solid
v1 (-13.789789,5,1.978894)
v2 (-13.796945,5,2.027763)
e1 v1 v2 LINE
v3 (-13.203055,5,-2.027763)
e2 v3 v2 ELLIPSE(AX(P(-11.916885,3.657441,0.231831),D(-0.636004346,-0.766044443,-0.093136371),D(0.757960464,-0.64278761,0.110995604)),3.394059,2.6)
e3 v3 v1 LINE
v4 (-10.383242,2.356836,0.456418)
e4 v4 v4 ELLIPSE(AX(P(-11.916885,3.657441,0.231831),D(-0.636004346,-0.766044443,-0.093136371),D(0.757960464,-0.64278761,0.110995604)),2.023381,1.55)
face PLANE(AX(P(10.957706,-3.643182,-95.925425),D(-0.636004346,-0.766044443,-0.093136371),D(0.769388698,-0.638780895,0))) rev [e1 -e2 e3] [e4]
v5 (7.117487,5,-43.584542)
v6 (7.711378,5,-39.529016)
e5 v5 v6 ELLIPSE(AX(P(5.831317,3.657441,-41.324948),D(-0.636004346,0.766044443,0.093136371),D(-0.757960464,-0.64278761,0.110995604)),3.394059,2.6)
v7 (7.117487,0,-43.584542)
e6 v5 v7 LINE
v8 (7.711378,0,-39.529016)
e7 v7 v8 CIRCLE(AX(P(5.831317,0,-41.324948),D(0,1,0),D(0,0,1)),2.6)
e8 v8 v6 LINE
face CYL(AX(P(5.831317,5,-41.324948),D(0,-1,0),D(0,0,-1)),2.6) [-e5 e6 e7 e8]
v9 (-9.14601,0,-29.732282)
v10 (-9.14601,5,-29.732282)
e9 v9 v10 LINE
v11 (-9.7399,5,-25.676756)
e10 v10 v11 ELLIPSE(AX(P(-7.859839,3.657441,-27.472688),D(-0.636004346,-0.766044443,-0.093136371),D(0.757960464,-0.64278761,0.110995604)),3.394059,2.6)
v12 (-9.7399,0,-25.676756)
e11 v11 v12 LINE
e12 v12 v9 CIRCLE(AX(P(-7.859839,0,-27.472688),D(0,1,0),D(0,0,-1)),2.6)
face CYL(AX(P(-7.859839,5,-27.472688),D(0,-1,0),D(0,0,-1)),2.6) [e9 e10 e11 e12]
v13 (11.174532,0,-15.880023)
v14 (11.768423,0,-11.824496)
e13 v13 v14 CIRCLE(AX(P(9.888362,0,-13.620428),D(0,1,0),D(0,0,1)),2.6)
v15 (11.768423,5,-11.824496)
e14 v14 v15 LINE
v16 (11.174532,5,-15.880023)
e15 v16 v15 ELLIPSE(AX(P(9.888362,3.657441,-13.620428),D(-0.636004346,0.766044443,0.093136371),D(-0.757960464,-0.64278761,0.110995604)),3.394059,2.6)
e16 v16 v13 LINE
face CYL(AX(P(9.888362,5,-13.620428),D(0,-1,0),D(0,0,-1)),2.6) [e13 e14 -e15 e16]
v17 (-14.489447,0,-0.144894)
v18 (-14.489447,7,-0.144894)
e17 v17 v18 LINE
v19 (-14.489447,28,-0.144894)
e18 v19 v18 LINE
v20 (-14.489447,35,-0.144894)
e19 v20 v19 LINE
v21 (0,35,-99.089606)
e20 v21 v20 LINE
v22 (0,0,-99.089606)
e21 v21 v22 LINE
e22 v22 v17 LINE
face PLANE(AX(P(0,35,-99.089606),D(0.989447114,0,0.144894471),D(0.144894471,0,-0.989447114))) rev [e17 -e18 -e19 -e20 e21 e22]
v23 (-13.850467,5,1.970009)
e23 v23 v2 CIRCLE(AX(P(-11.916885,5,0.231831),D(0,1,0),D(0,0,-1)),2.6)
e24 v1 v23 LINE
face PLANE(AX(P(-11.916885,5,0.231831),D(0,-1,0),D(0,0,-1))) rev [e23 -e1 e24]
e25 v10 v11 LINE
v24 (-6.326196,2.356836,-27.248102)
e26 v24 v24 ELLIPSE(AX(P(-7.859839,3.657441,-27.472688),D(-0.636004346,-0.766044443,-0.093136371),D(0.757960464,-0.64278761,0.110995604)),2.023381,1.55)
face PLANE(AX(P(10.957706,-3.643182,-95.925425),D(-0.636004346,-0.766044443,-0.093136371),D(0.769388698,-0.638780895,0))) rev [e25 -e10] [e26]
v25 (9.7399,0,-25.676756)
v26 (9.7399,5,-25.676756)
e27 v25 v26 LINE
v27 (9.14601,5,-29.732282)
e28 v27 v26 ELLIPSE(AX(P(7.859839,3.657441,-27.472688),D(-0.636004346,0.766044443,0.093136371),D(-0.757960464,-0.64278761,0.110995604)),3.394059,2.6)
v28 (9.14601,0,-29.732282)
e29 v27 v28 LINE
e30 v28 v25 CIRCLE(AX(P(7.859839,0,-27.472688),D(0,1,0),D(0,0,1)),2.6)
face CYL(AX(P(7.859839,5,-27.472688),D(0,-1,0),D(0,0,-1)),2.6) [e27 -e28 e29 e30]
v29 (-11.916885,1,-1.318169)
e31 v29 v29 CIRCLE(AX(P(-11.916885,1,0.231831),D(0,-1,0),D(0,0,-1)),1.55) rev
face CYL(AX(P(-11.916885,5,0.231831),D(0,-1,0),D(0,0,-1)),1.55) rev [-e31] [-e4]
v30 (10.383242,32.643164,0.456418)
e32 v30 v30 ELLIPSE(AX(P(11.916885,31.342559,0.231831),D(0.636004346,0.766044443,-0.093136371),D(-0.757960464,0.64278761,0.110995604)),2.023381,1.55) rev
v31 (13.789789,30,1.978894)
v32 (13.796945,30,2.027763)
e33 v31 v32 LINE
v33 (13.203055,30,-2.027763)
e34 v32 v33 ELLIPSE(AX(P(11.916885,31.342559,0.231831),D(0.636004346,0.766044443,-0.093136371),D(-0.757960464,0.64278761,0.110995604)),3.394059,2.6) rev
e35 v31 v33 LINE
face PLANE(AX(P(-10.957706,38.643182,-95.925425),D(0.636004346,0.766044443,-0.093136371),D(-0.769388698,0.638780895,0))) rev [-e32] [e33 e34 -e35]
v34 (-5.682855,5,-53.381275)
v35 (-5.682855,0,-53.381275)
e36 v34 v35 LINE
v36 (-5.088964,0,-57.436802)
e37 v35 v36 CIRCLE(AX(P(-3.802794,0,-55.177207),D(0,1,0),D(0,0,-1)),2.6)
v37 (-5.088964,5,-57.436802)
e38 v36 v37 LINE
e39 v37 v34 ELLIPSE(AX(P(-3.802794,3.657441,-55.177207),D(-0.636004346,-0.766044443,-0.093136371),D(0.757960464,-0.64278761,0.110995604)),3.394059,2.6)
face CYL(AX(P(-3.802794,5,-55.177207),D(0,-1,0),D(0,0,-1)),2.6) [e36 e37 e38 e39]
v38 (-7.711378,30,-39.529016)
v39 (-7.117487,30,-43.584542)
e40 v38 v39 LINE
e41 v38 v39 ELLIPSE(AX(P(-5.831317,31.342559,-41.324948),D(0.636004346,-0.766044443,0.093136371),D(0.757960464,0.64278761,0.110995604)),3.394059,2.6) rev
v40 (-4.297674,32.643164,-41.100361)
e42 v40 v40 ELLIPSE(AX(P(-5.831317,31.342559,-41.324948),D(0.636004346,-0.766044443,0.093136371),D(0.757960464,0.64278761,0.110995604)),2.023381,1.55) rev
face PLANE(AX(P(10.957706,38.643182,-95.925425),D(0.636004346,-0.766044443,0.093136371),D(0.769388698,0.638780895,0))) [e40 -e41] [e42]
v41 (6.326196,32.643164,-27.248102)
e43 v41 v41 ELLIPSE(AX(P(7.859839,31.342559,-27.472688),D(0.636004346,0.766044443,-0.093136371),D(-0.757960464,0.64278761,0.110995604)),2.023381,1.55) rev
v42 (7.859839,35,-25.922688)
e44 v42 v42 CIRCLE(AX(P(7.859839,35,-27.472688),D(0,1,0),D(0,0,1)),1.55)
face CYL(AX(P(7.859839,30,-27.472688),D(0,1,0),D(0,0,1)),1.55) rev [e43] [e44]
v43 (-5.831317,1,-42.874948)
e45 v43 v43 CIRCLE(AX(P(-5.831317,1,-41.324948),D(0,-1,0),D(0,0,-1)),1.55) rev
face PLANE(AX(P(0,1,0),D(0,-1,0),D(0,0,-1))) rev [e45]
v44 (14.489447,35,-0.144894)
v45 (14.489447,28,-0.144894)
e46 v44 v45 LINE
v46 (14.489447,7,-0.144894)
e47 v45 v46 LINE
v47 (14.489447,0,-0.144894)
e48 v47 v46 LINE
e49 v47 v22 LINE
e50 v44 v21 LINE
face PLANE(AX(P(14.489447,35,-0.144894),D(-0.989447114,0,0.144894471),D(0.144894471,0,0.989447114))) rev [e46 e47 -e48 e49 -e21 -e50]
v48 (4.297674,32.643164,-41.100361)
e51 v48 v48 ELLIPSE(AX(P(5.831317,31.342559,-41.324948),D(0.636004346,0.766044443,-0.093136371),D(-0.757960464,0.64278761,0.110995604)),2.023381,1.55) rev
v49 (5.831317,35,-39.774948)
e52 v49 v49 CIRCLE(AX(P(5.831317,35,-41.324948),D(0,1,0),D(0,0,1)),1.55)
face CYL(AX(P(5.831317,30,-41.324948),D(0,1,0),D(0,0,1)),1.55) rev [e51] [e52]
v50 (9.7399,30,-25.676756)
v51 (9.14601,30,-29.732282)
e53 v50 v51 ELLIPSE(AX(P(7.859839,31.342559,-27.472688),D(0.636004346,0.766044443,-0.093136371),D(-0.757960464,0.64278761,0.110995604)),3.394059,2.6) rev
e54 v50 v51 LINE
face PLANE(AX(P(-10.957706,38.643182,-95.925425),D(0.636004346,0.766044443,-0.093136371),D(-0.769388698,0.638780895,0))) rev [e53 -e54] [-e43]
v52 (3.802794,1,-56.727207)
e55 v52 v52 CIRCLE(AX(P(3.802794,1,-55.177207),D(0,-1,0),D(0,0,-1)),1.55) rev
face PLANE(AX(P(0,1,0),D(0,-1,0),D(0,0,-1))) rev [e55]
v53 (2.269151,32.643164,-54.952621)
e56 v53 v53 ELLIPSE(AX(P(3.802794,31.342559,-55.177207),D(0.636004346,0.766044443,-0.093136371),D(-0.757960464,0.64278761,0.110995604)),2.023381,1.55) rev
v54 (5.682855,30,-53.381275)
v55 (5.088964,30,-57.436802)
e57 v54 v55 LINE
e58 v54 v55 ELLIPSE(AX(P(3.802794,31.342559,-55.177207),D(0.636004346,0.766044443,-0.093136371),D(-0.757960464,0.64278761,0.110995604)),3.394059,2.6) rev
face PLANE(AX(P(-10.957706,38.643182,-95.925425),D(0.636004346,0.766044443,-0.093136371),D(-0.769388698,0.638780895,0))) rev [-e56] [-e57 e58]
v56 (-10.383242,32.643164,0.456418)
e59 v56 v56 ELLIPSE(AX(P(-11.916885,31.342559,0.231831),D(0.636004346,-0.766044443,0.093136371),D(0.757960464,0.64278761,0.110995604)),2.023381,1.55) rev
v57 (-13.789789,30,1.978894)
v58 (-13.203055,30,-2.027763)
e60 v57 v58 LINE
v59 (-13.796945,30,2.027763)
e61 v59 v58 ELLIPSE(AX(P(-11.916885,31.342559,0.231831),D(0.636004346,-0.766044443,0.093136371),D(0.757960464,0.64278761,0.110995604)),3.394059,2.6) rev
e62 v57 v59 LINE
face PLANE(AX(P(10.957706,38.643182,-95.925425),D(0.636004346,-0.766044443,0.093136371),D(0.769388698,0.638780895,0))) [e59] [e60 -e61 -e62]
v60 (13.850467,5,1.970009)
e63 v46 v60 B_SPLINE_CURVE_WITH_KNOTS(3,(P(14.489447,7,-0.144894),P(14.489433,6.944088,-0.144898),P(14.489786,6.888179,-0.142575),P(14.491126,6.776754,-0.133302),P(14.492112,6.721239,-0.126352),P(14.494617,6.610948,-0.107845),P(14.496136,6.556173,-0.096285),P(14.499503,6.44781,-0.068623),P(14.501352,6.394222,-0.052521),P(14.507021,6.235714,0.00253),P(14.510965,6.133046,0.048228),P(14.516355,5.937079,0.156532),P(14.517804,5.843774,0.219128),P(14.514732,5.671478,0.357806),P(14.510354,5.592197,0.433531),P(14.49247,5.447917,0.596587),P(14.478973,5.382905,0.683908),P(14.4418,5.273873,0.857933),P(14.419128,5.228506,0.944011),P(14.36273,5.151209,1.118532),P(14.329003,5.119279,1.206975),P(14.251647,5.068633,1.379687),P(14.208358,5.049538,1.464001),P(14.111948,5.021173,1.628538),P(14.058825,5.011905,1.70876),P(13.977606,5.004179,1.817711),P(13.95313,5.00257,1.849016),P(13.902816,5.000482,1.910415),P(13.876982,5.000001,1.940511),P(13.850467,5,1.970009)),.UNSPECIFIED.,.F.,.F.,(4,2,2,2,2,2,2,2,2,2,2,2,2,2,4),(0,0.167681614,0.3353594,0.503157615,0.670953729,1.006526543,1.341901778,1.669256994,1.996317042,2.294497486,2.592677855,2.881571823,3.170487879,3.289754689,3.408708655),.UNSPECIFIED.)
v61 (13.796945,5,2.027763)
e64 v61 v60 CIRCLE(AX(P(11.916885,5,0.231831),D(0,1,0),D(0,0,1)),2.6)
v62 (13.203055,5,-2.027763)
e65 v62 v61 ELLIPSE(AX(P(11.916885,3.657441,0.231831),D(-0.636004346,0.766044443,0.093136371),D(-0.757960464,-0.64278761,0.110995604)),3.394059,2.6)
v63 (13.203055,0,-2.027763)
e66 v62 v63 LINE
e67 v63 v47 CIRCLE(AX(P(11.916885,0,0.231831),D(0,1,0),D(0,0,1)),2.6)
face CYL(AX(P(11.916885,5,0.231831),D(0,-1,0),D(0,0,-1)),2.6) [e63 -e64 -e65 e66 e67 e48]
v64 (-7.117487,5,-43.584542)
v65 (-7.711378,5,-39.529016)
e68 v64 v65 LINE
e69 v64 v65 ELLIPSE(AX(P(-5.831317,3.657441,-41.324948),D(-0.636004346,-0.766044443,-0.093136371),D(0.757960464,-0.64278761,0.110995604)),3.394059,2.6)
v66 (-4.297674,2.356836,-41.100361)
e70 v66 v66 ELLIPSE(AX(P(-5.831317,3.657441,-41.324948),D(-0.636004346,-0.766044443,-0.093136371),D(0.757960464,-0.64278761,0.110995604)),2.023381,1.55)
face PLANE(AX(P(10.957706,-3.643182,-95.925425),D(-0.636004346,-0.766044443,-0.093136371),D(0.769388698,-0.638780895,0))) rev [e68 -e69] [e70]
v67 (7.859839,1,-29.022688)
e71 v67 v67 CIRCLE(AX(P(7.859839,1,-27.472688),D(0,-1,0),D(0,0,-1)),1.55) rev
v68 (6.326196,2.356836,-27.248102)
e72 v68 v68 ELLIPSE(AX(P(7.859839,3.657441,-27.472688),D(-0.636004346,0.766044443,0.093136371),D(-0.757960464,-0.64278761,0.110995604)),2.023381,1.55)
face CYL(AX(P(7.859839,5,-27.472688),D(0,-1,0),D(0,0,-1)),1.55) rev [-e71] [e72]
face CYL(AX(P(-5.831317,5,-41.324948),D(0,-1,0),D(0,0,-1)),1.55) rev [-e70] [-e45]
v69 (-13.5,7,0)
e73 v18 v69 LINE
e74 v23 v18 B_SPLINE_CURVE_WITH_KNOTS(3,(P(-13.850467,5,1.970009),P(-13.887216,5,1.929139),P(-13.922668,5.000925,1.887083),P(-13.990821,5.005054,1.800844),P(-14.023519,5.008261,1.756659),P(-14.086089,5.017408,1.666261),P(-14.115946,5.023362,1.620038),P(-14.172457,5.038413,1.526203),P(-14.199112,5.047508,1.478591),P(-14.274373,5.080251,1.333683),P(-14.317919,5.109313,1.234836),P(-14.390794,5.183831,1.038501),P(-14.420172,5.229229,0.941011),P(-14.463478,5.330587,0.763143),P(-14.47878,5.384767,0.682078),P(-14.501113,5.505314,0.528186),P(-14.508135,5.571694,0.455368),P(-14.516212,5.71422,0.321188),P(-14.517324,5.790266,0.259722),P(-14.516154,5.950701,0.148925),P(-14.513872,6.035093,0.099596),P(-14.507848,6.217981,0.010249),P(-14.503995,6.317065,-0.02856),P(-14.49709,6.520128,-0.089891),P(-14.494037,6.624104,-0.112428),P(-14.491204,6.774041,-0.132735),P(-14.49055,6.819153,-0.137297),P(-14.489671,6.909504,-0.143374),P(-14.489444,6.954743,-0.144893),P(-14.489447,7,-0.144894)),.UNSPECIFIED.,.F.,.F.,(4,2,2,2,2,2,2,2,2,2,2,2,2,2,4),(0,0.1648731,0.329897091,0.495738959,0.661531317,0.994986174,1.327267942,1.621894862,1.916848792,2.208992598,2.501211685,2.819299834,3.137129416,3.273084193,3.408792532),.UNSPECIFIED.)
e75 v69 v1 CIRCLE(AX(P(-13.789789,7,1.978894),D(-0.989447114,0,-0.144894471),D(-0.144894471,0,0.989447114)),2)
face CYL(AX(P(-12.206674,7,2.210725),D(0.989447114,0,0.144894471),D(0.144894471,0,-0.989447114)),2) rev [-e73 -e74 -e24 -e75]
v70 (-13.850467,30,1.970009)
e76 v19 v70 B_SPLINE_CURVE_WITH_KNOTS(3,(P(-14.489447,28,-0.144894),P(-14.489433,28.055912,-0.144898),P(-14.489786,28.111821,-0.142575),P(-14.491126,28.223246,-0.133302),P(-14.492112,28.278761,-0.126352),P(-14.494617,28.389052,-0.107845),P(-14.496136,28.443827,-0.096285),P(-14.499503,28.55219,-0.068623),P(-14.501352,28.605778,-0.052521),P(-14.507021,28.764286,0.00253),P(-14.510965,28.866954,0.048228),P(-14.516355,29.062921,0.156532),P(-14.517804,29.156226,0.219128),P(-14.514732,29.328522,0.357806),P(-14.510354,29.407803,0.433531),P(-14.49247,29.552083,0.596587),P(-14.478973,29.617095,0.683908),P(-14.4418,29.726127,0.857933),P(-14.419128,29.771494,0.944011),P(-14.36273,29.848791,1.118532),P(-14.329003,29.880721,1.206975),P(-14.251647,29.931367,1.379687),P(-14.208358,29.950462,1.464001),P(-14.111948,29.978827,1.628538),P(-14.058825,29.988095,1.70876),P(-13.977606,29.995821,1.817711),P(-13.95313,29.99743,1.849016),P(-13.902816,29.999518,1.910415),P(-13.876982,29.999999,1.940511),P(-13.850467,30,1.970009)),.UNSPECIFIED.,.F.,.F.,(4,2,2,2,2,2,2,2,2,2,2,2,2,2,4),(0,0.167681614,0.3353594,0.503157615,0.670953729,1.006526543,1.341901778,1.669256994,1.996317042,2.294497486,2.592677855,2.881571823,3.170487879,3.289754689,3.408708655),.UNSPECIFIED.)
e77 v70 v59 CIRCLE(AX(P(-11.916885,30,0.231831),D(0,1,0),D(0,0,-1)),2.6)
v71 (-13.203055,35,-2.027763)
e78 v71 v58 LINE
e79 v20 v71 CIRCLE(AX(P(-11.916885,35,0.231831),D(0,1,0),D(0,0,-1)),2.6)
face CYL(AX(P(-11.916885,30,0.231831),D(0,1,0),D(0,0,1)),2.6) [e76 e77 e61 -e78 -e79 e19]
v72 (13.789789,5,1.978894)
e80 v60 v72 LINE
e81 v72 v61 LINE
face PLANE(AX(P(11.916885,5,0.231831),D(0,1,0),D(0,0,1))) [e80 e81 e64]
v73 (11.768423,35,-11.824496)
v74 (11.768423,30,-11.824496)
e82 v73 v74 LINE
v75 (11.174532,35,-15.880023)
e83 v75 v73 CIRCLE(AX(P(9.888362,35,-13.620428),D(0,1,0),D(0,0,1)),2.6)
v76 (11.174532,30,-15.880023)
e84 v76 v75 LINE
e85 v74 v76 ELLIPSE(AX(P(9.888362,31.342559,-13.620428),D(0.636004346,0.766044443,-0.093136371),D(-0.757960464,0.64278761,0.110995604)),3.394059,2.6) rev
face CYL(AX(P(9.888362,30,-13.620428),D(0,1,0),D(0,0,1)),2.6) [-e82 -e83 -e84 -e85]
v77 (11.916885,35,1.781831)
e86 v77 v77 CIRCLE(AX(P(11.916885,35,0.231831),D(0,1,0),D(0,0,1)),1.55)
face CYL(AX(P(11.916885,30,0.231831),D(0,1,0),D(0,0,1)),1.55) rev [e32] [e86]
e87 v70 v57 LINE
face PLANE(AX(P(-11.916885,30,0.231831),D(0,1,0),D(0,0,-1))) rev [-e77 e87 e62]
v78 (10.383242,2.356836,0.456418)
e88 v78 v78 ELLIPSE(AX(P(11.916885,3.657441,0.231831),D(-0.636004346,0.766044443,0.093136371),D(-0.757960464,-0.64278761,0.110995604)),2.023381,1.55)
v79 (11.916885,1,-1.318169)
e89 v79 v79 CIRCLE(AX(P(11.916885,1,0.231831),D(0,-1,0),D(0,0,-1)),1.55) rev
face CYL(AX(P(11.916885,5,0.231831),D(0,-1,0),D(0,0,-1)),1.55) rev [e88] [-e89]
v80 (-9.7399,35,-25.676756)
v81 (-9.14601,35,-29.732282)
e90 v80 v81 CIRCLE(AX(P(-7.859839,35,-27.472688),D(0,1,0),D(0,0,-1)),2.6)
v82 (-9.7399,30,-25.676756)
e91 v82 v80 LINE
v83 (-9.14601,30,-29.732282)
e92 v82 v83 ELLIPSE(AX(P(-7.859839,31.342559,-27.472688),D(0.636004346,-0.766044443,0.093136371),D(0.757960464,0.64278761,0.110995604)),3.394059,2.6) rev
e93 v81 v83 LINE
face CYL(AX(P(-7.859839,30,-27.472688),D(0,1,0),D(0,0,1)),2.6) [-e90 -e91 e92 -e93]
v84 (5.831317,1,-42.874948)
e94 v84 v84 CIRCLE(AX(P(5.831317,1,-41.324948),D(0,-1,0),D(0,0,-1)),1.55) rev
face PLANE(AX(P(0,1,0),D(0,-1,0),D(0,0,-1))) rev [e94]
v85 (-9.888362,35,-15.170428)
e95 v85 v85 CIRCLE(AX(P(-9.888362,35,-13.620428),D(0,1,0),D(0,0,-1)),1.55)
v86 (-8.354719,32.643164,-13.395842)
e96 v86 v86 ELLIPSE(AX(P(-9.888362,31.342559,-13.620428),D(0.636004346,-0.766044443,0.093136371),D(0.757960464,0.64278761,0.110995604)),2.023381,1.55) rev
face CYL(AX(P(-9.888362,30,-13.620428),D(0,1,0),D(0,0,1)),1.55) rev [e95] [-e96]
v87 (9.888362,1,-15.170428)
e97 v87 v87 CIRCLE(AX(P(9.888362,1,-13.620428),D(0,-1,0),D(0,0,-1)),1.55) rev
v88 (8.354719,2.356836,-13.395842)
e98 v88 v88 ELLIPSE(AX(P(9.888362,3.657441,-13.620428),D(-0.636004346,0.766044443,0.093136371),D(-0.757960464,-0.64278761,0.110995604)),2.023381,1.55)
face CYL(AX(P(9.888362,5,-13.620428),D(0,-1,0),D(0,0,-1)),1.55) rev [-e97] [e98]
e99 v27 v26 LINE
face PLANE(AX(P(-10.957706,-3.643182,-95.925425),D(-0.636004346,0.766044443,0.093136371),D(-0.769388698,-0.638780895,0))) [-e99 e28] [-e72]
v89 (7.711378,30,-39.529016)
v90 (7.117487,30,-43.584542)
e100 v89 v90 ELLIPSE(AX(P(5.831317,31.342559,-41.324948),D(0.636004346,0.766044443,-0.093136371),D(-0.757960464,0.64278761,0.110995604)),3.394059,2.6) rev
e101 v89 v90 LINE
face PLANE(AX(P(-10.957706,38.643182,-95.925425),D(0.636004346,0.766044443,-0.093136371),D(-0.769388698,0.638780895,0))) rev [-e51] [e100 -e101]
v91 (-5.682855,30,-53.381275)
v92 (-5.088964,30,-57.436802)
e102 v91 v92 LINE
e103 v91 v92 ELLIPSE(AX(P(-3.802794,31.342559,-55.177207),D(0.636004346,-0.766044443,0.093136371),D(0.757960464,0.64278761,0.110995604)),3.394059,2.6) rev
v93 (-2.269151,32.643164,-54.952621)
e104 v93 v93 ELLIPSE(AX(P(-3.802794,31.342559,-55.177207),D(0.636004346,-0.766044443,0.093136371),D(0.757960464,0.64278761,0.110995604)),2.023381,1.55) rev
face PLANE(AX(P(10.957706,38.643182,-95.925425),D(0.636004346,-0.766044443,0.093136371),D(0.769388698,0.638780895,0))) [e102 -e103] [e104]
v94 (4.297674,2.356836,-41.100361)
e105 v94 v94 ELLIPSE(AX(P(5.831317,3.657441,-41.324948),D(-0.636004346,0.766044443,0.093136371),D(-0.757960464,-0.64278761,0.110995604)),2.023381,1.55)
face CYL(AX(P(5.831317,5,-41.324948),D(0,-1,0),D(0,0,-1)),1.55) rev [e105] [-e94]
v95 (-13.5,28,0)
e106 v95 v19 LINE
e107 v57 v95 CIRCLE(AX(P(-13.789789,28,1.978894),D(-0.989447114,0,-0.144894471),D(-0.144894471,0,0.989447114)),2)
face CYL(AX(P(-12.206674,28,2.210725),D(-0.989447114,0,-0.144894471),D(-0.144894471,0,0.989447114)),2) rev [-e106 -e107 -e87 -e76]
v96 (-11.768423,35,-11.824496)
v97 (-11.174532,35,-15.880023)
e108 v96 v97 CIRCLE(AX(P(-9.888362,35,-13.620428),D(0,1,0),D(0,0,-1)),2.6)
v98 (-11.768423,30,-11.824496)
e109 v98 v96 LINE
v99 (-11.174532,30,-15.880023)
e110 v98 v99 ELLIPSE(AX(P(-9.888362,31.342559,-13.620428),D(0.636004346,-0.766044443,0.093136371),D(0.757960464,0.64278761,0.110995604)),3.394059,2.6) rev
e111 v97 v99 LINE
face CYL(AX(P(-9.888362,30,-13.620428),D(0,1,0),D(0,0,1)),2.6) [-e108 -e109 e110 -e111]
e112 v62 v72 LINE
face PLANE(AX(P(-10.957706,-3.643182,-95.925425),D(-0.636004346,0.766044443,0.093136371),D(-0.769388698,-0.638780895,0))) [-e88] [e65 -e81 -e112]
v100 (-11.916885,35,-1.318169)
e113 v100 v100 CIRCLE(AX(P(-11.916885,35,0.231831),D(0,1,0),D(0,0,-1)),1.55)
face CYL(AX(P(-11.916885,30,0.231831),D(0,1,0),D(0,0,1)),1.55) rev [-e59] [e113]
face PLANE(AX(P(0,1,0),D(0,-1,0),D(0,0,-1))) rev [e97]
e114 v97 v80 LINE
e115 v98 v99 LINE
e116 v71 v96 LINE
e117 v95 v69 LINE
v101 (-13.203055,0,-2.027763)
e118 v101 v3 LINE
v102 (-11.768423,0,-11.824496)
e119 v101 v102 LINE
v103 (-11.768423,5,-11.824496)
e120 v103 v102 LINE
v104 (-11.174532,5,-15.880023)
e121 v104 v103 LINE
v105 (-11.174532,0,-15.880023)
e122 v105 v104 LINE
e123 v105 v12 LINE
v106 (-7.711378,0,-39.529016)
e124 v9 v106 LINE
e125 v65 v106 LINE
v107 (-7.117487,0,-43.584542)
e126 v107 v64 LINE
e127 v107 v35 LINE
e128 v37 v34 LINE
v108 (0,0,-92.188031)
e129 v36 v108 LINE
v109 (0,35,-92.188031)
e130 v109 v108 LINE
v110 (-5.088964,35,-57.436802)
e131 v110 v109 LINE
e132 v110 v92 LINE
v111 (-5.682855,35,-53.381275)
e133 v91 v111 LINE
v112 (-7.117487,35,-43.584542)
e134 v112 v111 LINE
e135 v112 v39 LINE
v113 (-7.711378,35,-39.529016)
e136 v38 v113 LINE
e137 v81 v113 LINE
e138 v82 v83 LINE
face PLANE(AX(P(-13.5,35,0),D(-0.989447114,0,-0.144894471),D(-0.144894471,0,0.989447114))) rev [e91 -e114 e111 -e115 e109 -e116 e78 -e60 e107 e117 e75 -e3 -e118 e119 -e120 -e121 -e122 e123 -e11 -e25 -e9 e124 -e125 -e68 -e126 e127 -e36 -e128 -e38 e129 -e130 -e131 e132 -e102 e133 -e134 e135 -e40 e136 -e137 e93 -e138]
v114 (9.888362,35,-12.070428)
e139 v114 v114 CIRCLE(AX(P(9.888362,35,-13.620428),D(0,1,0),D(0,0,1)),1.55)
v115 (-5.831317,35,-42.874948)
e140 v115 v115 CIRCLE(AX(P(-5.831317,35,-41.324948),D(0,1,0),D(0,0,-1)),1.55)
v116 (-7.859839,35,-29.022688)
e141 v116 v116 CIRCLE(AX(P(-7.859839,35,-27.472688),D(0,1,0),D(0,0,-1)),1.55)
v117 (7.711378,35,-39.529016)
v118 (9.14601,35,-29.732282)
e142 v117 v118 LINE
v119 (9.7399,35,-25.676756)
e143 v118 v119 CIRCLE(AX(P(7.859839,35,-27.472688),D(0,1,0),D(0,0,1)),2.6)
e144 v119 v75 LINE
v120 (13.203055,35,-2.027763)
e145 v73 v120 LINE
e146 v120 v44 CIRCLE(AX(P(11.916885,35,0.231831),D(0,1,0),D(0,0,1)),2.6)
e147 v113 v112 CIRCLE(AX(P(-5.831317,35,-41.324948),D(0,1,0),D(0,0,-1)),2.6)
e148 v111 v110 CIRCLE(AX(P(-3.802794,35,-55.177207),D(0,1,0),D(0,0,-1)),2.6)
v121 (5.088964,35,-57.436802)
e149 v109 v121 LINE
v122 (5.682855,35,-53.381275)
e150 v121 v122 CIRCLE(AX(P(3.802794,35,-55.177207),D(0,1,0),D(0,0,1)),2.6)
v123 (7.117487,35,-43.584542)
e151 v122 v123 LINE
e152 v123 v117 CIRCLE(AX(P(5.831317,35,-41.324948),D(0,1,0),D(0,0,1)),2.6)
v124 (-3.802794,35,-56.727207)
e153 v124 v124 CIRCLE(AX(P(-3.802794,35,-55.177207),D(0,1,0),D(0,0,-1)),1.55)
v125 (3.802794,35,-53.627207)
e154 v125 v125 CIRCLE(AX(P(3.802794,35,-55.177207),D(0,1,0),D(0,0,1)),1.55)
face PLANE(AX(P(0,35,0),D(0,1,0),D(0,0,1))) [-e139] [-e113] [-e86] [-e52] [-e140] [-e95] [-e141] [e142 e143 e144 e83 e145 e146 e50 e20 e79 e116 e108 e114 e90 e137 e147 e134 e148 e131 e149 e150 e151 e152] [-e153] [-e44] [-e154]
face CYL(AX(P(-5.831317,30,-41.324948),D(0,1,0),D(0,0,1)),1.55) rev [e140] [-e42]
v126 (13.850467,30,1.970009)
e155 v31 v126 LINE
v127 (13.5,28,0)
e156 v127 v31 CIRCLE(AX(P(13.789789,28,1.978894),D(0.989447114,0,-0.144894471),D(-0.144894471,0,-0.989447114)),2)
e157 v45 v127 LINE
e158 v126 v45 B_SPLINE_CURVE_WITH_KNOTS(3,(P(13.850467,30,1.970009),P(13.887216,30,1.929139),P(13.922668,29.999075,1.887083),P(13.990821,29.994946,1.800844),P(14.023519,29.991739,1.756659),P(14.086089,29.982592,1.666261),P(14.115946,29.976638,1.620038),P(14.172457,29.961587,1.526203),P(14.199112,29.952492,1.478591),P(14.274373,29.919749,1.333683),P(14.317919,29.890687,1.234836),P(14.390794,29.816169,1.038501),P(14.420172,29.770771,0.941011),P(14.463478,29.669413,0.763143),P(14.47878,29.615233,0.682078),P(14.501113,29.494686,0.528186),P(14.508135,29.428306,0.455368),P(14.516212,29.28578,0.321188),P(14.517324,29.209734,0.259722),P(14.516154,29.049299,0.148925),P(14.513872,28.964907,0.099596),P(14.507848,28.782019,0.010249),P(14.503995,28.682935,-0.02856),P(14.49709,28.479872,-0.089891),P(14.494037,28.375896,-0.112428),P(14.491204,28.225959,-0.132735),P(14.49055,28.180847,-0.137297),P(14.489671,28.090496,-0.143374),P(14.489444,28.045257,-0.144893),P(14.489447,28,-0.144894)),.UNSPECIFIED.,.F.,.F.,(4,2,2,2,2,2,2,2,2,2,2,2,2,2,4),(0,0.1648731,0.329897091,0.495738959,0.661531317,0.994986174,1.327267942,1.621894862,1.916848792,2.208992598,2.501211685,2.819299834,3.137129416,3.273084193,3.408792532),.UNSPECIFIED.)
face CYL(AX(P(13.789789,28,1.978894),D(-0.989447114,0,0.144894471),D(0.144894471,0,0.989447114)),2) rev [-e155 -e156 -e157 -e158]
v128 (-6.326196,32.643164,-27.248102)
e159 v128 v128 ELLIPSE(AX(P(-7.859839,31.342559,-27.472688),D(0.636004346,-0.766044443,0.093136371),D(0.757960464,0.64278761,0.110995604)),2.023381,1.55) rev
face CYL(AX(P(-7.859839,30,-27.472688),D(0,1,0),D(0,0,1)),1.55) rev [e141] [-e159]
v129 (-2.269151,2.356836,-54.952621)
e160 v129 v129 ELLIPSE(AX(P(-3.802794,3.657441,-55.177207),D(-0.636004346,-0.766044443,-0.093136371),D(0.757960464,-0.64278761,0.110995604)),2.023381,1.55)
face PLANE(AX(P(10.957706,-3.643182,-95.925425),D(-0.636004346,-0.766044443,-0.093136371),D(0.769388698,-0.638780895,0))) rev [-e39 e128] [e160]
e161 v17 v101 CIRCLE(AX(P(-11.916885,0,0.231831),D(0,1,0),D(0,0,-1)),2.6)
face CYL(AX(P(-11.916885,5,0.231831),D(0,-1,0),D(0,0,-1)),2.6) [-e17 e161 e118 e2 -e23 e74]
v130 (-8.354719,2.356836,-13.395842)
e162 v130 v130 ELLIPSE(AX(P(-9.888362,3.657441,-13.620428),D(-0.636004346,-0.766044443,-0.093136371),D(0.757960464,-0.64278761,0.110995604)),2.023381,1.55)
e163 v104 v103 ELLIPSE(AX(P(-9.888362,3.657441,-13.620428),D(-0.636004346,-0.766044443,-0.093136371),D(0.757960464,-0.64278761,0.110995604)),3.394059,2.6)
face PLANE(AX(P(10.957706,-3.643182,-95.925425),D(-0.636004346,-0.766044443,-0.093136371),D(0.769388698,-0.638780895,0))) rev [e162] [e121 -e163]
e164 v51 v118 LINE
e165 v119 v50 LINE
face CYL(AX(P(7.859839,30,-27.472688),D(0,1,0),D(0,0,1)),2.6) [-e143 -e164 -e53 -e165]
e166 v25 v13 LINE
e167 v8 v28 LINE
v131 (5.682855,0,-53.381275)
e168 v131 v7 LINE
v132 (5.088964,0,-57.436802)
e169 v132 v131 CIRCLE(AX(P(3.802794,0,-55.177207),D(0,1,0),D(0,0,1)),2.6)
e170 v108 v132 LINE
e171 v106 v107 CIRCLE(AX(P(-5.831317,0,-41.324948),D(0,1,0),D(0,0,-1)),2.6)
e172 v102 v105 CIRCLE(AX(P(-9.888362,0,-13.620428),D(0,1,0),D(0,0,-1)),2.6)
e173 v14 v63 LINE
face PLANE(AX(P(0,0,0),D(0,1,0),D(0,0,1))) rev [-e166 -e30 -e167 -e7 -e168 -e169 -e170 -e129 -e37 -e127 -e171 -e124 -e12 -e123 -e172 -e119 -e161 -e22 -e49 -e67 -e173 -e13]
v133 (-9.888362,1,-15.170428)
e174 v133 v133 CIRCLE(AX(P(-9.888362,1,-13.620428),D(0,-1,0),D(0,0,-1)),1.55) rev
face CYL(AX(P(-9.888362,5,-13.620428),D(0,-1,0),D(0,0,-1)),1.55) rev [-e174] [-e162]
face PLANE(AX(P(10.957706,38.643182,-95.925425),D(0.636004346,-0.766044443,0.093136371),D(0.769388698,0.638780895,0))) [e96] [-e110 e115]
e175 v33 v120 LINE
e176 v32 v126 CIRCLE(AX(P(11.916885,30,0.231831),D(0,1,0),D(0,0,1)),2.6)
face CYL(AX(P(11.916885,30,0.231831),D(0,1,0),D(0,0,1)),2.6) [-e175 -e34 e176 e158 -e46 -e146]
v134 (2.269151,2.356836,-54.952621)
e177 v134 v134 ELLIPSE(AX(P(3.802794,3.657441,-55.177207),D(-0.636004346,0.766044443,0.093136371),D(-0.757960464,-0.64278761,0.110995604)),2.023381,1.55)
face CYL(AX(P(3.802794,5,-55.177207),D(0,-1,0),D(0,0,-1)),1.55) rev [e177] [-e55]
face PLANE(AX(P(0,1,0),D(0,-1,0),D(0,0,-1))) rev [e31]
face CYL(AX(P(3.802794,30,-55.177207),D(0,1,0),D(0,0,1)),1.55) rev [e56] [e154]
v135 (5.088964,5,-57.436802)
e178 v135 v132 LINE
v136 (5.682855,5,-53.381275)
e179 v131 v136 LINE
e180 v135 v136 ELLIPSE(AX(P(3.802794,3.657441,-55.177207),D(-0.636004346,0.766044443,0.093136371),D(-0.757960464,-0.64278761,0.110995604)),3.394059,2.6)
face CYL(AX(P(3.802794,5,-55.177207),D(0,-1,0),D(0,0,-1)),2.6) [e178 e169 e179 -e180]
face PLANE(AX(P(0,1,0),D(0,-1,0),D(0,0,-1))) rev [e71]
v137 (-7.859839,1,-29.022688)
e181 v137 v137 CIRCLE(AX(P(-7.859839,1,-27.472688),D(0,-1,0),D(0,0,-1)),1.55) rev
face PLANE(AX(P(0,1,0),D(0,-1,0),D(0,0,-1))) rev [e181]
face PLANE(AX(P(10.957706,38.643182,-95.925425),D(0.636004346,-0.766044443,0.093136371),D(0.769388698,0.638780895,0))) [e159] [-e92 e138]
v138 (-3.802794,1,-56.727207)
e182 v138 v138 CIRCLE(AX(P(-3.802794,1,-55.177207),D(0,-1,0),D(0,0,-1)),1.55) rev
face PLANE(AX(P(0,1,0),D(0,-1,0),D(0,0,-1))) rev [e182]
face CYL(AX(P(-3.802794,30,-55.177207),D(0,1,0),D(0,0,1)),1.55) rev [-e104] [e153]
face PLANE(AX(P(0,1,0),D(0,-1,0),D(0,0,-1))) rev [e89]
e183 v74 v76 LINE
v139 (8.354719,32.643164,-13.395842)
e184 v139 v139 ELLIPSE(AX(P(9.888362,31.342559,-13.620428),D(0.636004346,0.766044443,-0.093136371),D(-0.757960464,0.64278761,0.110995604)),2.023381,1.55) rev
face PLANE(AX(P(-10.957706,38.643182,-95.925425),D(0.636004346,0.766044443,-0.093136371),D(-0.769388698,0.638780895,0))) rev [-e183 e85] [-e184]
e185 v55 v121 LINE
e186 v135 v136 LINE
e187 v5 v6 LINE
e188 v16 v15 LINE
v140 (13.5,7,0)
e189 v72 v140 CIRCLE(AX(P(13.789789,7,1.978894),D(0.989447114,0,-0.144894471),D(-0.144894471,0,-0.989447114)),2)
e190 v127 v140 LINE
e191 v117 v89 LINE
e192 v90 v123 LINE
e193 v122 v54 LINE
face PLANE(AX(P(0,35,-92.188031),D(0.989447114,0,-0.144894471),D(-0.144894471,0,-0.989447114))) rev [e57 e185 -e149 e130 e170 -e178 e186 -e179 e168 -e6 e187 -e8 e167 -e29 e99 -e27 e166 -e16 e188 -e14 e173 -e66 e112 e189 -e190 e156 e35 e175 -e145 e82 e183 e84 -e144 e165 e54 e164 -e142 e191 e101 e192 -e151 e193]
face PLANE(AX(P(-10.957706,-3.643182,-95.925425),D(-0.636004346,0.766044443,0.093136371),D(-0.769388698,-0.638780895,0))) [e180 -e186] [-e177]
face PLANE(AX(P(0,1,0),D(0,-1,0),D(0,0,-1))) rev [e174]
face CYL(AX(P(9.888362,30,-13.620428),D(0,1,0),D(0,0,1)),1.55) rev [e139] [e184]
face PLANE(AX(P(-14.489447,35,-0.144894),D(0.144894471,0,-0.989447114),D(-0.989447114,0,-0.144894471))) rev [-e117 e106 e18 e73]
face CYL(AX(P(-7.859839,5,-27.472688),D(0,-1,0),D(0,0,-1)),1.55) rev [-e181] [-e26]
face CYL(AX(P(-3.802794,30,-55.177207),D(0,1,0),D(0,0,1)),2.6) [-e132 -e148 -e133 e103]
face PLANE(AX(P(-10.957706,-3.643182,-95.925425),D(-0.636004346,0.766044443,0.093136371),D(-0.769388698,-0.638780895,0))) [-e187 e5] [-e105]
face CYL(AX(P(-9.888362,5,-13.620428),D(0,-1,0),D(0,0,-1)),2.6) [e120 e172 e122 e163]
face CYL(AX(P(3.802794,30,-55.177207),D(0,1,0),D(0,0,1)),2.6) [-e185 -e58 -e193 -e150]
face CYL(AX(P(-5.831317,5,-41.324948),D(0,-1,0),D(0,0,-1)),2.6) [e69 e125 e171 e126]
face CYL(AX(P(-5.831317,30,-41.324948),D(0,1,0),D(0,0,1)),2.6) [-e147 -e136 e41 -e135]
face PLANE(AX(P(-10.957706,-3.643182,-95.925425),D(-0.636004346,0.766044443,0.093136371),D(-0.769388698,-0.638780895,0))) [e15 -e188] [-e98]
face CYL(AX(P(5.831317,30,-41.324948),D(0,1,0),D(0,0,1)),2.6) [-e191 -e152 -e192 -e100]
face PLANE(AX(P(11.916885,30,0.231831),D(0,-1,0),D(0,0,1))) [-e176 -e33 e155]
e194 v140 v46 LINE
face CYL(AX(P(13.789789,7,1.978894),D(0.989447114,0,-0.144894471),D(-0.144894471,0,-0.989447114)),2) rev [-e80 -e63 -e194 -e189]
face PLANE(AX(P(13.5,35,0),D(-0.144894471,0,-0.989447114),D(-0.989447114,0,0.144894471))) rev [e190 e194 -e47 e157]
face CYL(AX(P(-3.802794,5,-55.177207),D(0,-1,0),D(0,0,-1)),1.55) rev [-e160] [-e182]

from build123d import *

# Parameters (mm, degrees)
BOSS_EXTRUDE1_DEPTH            = 35
SKETCH2_R                      = 2.6
SKETCH2_R_2                    = 1.55
BOSS_EXTRUDE3_DEPTH            = 5
CUT_EXTRUDE1_REACH             = 109.936
CUT_EXTRUDE1_DIRECTION_2_DEPTH = 108.935664458
CUT_EXTRUDE2_REACH             = 109.936
CUT_EXTRUDE2_DIRECTION_2_DEPTH = 108.935664458
FILLET1_R                      = 2
SKETCH6_R                      = 1.55
BOSS_EXTRUDE4_DEPTH            = 1


with BuildPart() as part:
    # Sketch1 → Boss-Extrude1 (new body)
    with BuildSketch(Plane(origin=(0, 0, 0), x_dir=(1, 0, 0), z_dir=(0, 1, 0))):
        Polygon((-13.5, 0), (0, 92.188031325), (13.5, 0), (14.489447114, 0.144894471), (0, 99.089605913), (-14.489447114, 0.144894471), align=None)
    extrude(amount=BOSS_EXTRUDE1_DEPTH)

    # Sketch2 → Boss-Extrude3 (add)
    # profile 1 of 10: a face of its own
    with BuildSketch(Plane(origin=(0, 0, 0), x_dir=(1, 0, 0), z_dir=(0, 1, 0))):
        with Locations((11.916884617, -0.231831154)):
            Circle(SKETCH2_R)
        with Locations(Location((11.916884617, -0.231831154, 0), (0, 0, 270))):
            Circle(SKETCH2_R_2, mode=Mode.SUBTRACT)
    # profile 2 of 10: a face of its own
    with BuildSketch(Plane(origin=(0, 0, 0), x_dir=(1, 0, 0), z_dir=(0, 1, 0))):
        with Locations((9.888362021, 13.620428448)):
            Circle(SKETCH2_R)
        with Locations(Location((9.888362021, 13.620428448, 0), (0, 0, 270))):
            Circle(SKETCH2_R_2, mode=Mode.SUBTRACT)
    # profile 3 of 10: a face of its own
    with BuildSketch(Plane(origin=(0, 0, 0), x_dir=(1, 0, 0), z_dir=(0, 1, 0))):
        with Locations((7.859839425, 27.47268805)):
            Circle(SKETCH2_R)
        with Locations(Location((7.859839425, 27.47268805, 0), (0, 0, 270))):
            Circle(SKETCH2_R_2, mode=Mode.SUBTRACT)
    # profile 4 of 10: a face of its own
    with BuildSketch(Plane(origin=(0, 0, 0), x_dir=(1, 0, 0), z_dir=(0, 1, 0))):
        with Locations((5.831316829, 41.324947652)):
            Circle(SKETCH2_R)
        with Locations(Location((5.831316829, 41.324947652, 0), (0, 0, 270))):
            Circle(SKETCH2_R_2, mode=Mode.SUBTRACT)
    # profile 5 of 10: a face of its own
    with BuildSketch(Plane(origin=(0, 0, 0), x_dir=(1, 0, 0), z_dir=(0, 1, 0))):
        with Locations((3.802794233, 55.177207254)):
            Circle(SKETCH2_R)
        with Locations(Location((3.802794233, 55.177207254, 0), (0, 0, 270))):
            Circle(SKETCH2_R_2, mode=Mode.SUBTRACT)
    # profile 6 of 10: a face of its own
    with BuildSketch(Plane(origin=(0, 0, 0), x_dir=(1, 0, 0), z_dir=(0, 1, 0))):
        with Locations((-11.916884617, -0.231831154)):
            Circle(SKETCH2_R)
        with Locations(Location((-11.916884617, -0.231831154, 0), (0, 0, 90))):
            Circle(SKETCH2_R_2, mode=Mode.SUBTRACT)
    # profile 7 of 10: a face of its own
    with BuildSketch(Plane(origin=(0, 0, 0), x_dir=(1, 0, 0), z_dir=(0, 1, 0))):
        with Locations((-9.888362021, 13.620428448)):
            Circle(SKETCH2_R)
        with Locations(Location((-9.888362021, 13.620428448, 0), (0, 0, 90))):
            Circle(SKETCH2_R_2, mode=Mode.SUBTRACT)
    # profile 8 of 10: a face of its own
    with BuildSketch(Plane(origin=(0, 0, 0), x_dir=(1, 0, 0), z_dir=(0, 1, 0))):
        with Locations((-7.859839425, 27.47268805)):
            Circle(SKETCH2_R)
        with Locations(Location((-7.859839425, 27.47268805, 0), (0, 0, 90))):
            Circle(SKETCH2_R_2, mode=Mode.SUBTRACT)
    # profile 9 of 10: a face of its own
    with BuildSketch(Plane(origin=(0, 0, 0), x_dir=(1, 0, 0), z_dir=(0, 1, 0))):
        with Locations((-5.831316829, 41.324947652)):
            Circle(SKETCH2_R)
        with Locations(Location((-5.831316829, 41.324947652, 0), (0, 0, 90))):
            Circle(SKETCH2_R_2, mode=Mode.SUBTRACT)
    # profile 10 of 10: a face of its own
    with BuildSketch(Plane(origin=(0, 0, 0), x_dir=(1, 0, 0), z_dir=(0, 1, 0))):
        with Locations((-3.802794233, 55.177207254)):
            Circle(SKETCH2_R)
        with Locations(Location((-3.802794233, 55.177207254, 0), (0, 0, 90))):
            Circle(SKETCH2_R_2, mode=Mode.SUBTRACT)
    boss_extrude3 = extrude(amount=BOSS_EXTRUDE3_DEPTH)

    # Cut-Extrude1: up to this face of the body (flat: up to its plane)
    cut_extrude1_end = Plane(part.part.faces().sort_by_distance((-6.685224914, 17.936553529, -46.536348085))[0])
    # Sketch4 → Cut-Extrude1 (cut, up to the picked face)
    with BuildSketch(Plane(origin=(0.283424505, 0, 1.935433121), x_dir=(0.9894471144188783, 0, -0.14489447114419254), z_dir=(0.14489447114419252, 0, 0.9894471144188782)), mode=Mode.PRIVATE) as cut_extrude1_sk1:
        Polygon((13.357536045, 5), (9.157536045, 5), (9.157536045, 1.475781549), align=None)
    cut_extrude1_tool1 = split(extrude(cut_extrude1_sk1.sketch, amount=-CUT_EXTRUDE1_REACH, mode=Mode.PRIVATE), bisect_by=cut_extrude1_end, keep=Keep.BOTH, mode=Mode.PRIVATE)
    cut_extrude1 = cut_extrude1_tool1.solids().sort_by(Axis((10.729548, 3.825261, 0.405705), (-0.14489447114419252, 0, -0.9894471144188782)))[0]
    add(cut_extrude1, mode=Mode.SUBTRACT)

    # Sketch4 → Cut-Extrude1 direction 2 (cut)
    with BuildSketch(Plane(origin=(0.283424505, 0, 1.935433121), x_dir=(0.9894471144188783, 0, -0.14489447114419254), z_dir=(0.14489447114419252, 0, 0.9894471144188782))):
        Polygon((13.357536045, 5), (9.157536045, 5), (9.157536045, 1.475781549), align=None)
    cut_extrude1_direction_2 = extrude(amount=CUT_EXTRUDE1_DIRECTION_2_DEPTH, mode=Mode.SUBTRACT)

    # Cut-Extrude2: up to this face of the body (flat: up to its plane)
    cut_extrude2_end = Plane(part.part.faces().sort_by_distance((6.685224914, 17.936553529, -46.536348085))[0])
    # Sketch5 → Cut-Extrude2 (cut, up to the picked face)
    with BuildSketch(Plane(origin=(-0.283424505, 0, 1.935433121), x_dir=(0.9894471144188784, 0, 0.14489447114419146), z_dir=(-0.14489447114419146, 0, 0.9894471144188784)), mode=Mode.PRIVATE) as cut_extrude2_sk1:
        Polygon((-9.157536045, 5), (-9.157536045, 1.475781549), (-13.357536045, 5), align=None)
    cut_extrude2_tool1 = split(extrude(cut_extrude2_sk1.sketch, amount=-CUT_EXTRUDE2_REACH, mode=Mode.PRIVATE), bisect_by=cut_extrude2_end, keep=Keep.BOTH, mode=Mode.PRIVATE)
    cut_extrude2 = cut_extrude2_tool1.solids().sort_by(Axis((-10.729548, 3.825261, 0.405705), (0.14489447114419146, 0, -0.9894471144188784)))[0]
    add(cut_extrude2, mode=Mode.SUBTRACT)

    # Sketch5 → Cut-Extrude2 direction 2 (cut)
    with BuildSketch(Plane(origin=(-0.283424505, 0, 1.935433121), x_dir=(0.9894471144188784, 0, 0.14489447114419146), z_dir=(-0.14489447114419146, 0, 0.9894471144188784))):
        Polygon((-9.157536045, 5), (-9.157536045, 1.475781549), (-13.357536045, 5), align=None)
    cut_extrude2_direction_2 = extrude(amount=CUT_EXTRUDE2_DIRECTION_2_DEPTH, mode=Mode.SUBTRACT)

    # Mirror2: Boss-Extrude3, Cut-Extrude1, Cut-Extrude1 direction 2, Cut-Extrude2, Cut-Extrude2 direction 2 across plane
    add(boss_extrude3.mirror(Plane.ZX.offset(17.5)))
    add(cut_extrude1.mirror(Plane.ZX.offset(17.5)), mode=Mode.SUBTRACT)
    add(cut_extrude1_direction_2.mirror(Plane.ZX.offset(17.5)), mode=Mode.SUBTRACT)
    add(cut_extrude2.mirror(Plane.ZX.offset(17.5)), mode=Mode.SUBTRACT)
    add(cut_extrude2_direction_2.mirror(Plane.ZX.offset(17.5)), mode=Mode.SUBTRACT)

    # Fillet1
    # the kernel refuses this fillet: 2 mm, written as the material it adds along each edge
    with BuildSketch(Plane(origin=(13.5, 5, 0), x_dir=(0, 1, 0), z_dir=(0.9894471144188783, 0, -0.1448944711441925))) as fillet1_piece_1_section:
        with BuildLine():
            CenterArc((FILLET1_R, FILLET1_R), FILLET1_R, 180, 90)
            Line((0, FILLET1_R), (0, 0))
            Line((0, 0), (FILLET1_R, 0))
        make_face()
    fillet1_piece_1 = extrude(amount=6, mode=Mode.PRIVATE)
    fillet1_piece_1 = fillet1_piece_1 & Plane(origin=(11.916884617, 5.699977741, 0.231831154), x_dir=(1, 0, 0), z_dir=(0, -1, 0)) * Cylinder(2.6, 20, mode=Mode.PRIVATE)
    add(fillet1_piece_1)
    with BuildSketch(Plane(origin=(13.5, 30, 0), x_dir=(0, -1, 0), z_dir=(0.9894471144188783, 0, -0.1448944711441925))) as fillet1_piece_2_section:
        with BuildLine():
            CenterArc((FILLET1_R, -FILLET1_R), FILLET1_R, 90, 90)
            Line((0, -FILLET1_R), (0, 0))
            Line((0, 0), (FILLET1_R, 0))
        make_face()
    fillet1_piece_2 = extrude(amount=6, mode=Mode.PRIVATE)
    fillet1_piece_2 = fillet1_piece_2 & Plane(origin=(11.916884617, 29.30002226, 0.231831154), x_dir=(1, 0, 0), z_dir=(0, 1, 0)) * Cylinder(2.6, 20, mode=Mode.PRIVATE)
    add(fillet1_piece_2)
    with BuildSketch(Plane(origin=(-19.436682687, 30, -0.869366827), x_dir=(0, -1, 0), z_dir=(0.9894471144188784, 0, 0.1448944711441914))) as fillet1_piece_3_section:
        with BuildLine():
            CenterArc((FILLET1_R, -FILLET1_R), FILLET1_R, 90, 90)
            Line((0, -FILLET1_R), (0, 0))
            Line((0, 0), (FILLET1_R, 0))
        make_face()
    fillet1_piece_3 = extrude(amount=6, mode=Mode.PRIVATE)
    fillet1_piece_3 = fillet1_piece_3 & Plane(origin=(-11.916884617, 29.777637105, 0.231831154), x_dir=(1, 0, 0), z_dir=(0, 1, 0)) * Cylinder(2.6, 21, mode=Mode.PRIVATE)
    add(fillet1_piece_3)
    with BuildSketch(Plane(origin=(-19.436682687, 5, -0.869366827), x_dir=(-0.1448944711441914, 0, 0.9894471144188784), z_dir=(0.9894471144188784, 0, 0.1448944711441914))) as fillet1_piece_4_section:
        with BuildLine():
            CenterArc((FILLET1_R, -FILLET1_R), FILLET1_R, 90, 90)
            Line((0, -FILLET1_R), (0, 0))
            Line((0, 0), (FILLET1_R, 0))
        make_face()
    fillet1_piece_4 = extrude(amount=6, mode=Mode.PRIVATE)
    fillet1_piece_4 = fillet1_piece_4 & Plane(origin=(-11.916884617, 5.222362792, 0.231831154), x_dir=(1, 0, 0), z_dir=(0, -1, 0)) * Cylinder(2.6, 21, mode=Mode.PRIVATE)
    add(fillet1_piece_4)

    # Sketch6 → Boss-Extrude4 (add)
    with BuildSketch(Plane.XZ):
        with Locations(Location((3.802794233, -55.177207254, 0), (0, 0, 270))):
            Circle(SKETCH6_R)
        with Locations(Location((-3.802794233, -55.177207254, 0), (0, 0, 270))):
            Circle(SKETCH6_R)
        with Locations(Location((-5.831316829, -41.324947652, 0), (0, 0, 270))):
            Circle(SKETCH6_R)
        with Locations(Location((5.831316829, -41.324947652, 0), (0, 0, 270))):
            Circle(SKETCH6_R)
        with Locations(Location((7.859839425, -27.47268805, 0), (0, 0, 270))):
            Circle(SKETCH6_R)
        with Locations(Location((-7.859839425, -27.47268805, 0), (0, 0, 270))):
            Circle(SKETCH6_R)
        with Locations(Location((-9.888362021, -13.620428448, 0), (0, 0, 270))):
            Circle(SKETCH6_R)
        with Locations(Location((9.888362021, -13.620428448, 0), (0, 0, 270))):
            Circle(SKETCH6_R)
        with Locations(Location((11.916884617, 0.231831154, 0), (0, 0, 270))):
            Circle(SKETCH6_R)
        with Locations(Location((-11.916884617, 0.231831154, 0), (0, 0, 270))):
            Circle(SKETCH6_R)
    extrude(amount=-BOSS_EXTRUDE4_DEPTH)


solid = part.part
